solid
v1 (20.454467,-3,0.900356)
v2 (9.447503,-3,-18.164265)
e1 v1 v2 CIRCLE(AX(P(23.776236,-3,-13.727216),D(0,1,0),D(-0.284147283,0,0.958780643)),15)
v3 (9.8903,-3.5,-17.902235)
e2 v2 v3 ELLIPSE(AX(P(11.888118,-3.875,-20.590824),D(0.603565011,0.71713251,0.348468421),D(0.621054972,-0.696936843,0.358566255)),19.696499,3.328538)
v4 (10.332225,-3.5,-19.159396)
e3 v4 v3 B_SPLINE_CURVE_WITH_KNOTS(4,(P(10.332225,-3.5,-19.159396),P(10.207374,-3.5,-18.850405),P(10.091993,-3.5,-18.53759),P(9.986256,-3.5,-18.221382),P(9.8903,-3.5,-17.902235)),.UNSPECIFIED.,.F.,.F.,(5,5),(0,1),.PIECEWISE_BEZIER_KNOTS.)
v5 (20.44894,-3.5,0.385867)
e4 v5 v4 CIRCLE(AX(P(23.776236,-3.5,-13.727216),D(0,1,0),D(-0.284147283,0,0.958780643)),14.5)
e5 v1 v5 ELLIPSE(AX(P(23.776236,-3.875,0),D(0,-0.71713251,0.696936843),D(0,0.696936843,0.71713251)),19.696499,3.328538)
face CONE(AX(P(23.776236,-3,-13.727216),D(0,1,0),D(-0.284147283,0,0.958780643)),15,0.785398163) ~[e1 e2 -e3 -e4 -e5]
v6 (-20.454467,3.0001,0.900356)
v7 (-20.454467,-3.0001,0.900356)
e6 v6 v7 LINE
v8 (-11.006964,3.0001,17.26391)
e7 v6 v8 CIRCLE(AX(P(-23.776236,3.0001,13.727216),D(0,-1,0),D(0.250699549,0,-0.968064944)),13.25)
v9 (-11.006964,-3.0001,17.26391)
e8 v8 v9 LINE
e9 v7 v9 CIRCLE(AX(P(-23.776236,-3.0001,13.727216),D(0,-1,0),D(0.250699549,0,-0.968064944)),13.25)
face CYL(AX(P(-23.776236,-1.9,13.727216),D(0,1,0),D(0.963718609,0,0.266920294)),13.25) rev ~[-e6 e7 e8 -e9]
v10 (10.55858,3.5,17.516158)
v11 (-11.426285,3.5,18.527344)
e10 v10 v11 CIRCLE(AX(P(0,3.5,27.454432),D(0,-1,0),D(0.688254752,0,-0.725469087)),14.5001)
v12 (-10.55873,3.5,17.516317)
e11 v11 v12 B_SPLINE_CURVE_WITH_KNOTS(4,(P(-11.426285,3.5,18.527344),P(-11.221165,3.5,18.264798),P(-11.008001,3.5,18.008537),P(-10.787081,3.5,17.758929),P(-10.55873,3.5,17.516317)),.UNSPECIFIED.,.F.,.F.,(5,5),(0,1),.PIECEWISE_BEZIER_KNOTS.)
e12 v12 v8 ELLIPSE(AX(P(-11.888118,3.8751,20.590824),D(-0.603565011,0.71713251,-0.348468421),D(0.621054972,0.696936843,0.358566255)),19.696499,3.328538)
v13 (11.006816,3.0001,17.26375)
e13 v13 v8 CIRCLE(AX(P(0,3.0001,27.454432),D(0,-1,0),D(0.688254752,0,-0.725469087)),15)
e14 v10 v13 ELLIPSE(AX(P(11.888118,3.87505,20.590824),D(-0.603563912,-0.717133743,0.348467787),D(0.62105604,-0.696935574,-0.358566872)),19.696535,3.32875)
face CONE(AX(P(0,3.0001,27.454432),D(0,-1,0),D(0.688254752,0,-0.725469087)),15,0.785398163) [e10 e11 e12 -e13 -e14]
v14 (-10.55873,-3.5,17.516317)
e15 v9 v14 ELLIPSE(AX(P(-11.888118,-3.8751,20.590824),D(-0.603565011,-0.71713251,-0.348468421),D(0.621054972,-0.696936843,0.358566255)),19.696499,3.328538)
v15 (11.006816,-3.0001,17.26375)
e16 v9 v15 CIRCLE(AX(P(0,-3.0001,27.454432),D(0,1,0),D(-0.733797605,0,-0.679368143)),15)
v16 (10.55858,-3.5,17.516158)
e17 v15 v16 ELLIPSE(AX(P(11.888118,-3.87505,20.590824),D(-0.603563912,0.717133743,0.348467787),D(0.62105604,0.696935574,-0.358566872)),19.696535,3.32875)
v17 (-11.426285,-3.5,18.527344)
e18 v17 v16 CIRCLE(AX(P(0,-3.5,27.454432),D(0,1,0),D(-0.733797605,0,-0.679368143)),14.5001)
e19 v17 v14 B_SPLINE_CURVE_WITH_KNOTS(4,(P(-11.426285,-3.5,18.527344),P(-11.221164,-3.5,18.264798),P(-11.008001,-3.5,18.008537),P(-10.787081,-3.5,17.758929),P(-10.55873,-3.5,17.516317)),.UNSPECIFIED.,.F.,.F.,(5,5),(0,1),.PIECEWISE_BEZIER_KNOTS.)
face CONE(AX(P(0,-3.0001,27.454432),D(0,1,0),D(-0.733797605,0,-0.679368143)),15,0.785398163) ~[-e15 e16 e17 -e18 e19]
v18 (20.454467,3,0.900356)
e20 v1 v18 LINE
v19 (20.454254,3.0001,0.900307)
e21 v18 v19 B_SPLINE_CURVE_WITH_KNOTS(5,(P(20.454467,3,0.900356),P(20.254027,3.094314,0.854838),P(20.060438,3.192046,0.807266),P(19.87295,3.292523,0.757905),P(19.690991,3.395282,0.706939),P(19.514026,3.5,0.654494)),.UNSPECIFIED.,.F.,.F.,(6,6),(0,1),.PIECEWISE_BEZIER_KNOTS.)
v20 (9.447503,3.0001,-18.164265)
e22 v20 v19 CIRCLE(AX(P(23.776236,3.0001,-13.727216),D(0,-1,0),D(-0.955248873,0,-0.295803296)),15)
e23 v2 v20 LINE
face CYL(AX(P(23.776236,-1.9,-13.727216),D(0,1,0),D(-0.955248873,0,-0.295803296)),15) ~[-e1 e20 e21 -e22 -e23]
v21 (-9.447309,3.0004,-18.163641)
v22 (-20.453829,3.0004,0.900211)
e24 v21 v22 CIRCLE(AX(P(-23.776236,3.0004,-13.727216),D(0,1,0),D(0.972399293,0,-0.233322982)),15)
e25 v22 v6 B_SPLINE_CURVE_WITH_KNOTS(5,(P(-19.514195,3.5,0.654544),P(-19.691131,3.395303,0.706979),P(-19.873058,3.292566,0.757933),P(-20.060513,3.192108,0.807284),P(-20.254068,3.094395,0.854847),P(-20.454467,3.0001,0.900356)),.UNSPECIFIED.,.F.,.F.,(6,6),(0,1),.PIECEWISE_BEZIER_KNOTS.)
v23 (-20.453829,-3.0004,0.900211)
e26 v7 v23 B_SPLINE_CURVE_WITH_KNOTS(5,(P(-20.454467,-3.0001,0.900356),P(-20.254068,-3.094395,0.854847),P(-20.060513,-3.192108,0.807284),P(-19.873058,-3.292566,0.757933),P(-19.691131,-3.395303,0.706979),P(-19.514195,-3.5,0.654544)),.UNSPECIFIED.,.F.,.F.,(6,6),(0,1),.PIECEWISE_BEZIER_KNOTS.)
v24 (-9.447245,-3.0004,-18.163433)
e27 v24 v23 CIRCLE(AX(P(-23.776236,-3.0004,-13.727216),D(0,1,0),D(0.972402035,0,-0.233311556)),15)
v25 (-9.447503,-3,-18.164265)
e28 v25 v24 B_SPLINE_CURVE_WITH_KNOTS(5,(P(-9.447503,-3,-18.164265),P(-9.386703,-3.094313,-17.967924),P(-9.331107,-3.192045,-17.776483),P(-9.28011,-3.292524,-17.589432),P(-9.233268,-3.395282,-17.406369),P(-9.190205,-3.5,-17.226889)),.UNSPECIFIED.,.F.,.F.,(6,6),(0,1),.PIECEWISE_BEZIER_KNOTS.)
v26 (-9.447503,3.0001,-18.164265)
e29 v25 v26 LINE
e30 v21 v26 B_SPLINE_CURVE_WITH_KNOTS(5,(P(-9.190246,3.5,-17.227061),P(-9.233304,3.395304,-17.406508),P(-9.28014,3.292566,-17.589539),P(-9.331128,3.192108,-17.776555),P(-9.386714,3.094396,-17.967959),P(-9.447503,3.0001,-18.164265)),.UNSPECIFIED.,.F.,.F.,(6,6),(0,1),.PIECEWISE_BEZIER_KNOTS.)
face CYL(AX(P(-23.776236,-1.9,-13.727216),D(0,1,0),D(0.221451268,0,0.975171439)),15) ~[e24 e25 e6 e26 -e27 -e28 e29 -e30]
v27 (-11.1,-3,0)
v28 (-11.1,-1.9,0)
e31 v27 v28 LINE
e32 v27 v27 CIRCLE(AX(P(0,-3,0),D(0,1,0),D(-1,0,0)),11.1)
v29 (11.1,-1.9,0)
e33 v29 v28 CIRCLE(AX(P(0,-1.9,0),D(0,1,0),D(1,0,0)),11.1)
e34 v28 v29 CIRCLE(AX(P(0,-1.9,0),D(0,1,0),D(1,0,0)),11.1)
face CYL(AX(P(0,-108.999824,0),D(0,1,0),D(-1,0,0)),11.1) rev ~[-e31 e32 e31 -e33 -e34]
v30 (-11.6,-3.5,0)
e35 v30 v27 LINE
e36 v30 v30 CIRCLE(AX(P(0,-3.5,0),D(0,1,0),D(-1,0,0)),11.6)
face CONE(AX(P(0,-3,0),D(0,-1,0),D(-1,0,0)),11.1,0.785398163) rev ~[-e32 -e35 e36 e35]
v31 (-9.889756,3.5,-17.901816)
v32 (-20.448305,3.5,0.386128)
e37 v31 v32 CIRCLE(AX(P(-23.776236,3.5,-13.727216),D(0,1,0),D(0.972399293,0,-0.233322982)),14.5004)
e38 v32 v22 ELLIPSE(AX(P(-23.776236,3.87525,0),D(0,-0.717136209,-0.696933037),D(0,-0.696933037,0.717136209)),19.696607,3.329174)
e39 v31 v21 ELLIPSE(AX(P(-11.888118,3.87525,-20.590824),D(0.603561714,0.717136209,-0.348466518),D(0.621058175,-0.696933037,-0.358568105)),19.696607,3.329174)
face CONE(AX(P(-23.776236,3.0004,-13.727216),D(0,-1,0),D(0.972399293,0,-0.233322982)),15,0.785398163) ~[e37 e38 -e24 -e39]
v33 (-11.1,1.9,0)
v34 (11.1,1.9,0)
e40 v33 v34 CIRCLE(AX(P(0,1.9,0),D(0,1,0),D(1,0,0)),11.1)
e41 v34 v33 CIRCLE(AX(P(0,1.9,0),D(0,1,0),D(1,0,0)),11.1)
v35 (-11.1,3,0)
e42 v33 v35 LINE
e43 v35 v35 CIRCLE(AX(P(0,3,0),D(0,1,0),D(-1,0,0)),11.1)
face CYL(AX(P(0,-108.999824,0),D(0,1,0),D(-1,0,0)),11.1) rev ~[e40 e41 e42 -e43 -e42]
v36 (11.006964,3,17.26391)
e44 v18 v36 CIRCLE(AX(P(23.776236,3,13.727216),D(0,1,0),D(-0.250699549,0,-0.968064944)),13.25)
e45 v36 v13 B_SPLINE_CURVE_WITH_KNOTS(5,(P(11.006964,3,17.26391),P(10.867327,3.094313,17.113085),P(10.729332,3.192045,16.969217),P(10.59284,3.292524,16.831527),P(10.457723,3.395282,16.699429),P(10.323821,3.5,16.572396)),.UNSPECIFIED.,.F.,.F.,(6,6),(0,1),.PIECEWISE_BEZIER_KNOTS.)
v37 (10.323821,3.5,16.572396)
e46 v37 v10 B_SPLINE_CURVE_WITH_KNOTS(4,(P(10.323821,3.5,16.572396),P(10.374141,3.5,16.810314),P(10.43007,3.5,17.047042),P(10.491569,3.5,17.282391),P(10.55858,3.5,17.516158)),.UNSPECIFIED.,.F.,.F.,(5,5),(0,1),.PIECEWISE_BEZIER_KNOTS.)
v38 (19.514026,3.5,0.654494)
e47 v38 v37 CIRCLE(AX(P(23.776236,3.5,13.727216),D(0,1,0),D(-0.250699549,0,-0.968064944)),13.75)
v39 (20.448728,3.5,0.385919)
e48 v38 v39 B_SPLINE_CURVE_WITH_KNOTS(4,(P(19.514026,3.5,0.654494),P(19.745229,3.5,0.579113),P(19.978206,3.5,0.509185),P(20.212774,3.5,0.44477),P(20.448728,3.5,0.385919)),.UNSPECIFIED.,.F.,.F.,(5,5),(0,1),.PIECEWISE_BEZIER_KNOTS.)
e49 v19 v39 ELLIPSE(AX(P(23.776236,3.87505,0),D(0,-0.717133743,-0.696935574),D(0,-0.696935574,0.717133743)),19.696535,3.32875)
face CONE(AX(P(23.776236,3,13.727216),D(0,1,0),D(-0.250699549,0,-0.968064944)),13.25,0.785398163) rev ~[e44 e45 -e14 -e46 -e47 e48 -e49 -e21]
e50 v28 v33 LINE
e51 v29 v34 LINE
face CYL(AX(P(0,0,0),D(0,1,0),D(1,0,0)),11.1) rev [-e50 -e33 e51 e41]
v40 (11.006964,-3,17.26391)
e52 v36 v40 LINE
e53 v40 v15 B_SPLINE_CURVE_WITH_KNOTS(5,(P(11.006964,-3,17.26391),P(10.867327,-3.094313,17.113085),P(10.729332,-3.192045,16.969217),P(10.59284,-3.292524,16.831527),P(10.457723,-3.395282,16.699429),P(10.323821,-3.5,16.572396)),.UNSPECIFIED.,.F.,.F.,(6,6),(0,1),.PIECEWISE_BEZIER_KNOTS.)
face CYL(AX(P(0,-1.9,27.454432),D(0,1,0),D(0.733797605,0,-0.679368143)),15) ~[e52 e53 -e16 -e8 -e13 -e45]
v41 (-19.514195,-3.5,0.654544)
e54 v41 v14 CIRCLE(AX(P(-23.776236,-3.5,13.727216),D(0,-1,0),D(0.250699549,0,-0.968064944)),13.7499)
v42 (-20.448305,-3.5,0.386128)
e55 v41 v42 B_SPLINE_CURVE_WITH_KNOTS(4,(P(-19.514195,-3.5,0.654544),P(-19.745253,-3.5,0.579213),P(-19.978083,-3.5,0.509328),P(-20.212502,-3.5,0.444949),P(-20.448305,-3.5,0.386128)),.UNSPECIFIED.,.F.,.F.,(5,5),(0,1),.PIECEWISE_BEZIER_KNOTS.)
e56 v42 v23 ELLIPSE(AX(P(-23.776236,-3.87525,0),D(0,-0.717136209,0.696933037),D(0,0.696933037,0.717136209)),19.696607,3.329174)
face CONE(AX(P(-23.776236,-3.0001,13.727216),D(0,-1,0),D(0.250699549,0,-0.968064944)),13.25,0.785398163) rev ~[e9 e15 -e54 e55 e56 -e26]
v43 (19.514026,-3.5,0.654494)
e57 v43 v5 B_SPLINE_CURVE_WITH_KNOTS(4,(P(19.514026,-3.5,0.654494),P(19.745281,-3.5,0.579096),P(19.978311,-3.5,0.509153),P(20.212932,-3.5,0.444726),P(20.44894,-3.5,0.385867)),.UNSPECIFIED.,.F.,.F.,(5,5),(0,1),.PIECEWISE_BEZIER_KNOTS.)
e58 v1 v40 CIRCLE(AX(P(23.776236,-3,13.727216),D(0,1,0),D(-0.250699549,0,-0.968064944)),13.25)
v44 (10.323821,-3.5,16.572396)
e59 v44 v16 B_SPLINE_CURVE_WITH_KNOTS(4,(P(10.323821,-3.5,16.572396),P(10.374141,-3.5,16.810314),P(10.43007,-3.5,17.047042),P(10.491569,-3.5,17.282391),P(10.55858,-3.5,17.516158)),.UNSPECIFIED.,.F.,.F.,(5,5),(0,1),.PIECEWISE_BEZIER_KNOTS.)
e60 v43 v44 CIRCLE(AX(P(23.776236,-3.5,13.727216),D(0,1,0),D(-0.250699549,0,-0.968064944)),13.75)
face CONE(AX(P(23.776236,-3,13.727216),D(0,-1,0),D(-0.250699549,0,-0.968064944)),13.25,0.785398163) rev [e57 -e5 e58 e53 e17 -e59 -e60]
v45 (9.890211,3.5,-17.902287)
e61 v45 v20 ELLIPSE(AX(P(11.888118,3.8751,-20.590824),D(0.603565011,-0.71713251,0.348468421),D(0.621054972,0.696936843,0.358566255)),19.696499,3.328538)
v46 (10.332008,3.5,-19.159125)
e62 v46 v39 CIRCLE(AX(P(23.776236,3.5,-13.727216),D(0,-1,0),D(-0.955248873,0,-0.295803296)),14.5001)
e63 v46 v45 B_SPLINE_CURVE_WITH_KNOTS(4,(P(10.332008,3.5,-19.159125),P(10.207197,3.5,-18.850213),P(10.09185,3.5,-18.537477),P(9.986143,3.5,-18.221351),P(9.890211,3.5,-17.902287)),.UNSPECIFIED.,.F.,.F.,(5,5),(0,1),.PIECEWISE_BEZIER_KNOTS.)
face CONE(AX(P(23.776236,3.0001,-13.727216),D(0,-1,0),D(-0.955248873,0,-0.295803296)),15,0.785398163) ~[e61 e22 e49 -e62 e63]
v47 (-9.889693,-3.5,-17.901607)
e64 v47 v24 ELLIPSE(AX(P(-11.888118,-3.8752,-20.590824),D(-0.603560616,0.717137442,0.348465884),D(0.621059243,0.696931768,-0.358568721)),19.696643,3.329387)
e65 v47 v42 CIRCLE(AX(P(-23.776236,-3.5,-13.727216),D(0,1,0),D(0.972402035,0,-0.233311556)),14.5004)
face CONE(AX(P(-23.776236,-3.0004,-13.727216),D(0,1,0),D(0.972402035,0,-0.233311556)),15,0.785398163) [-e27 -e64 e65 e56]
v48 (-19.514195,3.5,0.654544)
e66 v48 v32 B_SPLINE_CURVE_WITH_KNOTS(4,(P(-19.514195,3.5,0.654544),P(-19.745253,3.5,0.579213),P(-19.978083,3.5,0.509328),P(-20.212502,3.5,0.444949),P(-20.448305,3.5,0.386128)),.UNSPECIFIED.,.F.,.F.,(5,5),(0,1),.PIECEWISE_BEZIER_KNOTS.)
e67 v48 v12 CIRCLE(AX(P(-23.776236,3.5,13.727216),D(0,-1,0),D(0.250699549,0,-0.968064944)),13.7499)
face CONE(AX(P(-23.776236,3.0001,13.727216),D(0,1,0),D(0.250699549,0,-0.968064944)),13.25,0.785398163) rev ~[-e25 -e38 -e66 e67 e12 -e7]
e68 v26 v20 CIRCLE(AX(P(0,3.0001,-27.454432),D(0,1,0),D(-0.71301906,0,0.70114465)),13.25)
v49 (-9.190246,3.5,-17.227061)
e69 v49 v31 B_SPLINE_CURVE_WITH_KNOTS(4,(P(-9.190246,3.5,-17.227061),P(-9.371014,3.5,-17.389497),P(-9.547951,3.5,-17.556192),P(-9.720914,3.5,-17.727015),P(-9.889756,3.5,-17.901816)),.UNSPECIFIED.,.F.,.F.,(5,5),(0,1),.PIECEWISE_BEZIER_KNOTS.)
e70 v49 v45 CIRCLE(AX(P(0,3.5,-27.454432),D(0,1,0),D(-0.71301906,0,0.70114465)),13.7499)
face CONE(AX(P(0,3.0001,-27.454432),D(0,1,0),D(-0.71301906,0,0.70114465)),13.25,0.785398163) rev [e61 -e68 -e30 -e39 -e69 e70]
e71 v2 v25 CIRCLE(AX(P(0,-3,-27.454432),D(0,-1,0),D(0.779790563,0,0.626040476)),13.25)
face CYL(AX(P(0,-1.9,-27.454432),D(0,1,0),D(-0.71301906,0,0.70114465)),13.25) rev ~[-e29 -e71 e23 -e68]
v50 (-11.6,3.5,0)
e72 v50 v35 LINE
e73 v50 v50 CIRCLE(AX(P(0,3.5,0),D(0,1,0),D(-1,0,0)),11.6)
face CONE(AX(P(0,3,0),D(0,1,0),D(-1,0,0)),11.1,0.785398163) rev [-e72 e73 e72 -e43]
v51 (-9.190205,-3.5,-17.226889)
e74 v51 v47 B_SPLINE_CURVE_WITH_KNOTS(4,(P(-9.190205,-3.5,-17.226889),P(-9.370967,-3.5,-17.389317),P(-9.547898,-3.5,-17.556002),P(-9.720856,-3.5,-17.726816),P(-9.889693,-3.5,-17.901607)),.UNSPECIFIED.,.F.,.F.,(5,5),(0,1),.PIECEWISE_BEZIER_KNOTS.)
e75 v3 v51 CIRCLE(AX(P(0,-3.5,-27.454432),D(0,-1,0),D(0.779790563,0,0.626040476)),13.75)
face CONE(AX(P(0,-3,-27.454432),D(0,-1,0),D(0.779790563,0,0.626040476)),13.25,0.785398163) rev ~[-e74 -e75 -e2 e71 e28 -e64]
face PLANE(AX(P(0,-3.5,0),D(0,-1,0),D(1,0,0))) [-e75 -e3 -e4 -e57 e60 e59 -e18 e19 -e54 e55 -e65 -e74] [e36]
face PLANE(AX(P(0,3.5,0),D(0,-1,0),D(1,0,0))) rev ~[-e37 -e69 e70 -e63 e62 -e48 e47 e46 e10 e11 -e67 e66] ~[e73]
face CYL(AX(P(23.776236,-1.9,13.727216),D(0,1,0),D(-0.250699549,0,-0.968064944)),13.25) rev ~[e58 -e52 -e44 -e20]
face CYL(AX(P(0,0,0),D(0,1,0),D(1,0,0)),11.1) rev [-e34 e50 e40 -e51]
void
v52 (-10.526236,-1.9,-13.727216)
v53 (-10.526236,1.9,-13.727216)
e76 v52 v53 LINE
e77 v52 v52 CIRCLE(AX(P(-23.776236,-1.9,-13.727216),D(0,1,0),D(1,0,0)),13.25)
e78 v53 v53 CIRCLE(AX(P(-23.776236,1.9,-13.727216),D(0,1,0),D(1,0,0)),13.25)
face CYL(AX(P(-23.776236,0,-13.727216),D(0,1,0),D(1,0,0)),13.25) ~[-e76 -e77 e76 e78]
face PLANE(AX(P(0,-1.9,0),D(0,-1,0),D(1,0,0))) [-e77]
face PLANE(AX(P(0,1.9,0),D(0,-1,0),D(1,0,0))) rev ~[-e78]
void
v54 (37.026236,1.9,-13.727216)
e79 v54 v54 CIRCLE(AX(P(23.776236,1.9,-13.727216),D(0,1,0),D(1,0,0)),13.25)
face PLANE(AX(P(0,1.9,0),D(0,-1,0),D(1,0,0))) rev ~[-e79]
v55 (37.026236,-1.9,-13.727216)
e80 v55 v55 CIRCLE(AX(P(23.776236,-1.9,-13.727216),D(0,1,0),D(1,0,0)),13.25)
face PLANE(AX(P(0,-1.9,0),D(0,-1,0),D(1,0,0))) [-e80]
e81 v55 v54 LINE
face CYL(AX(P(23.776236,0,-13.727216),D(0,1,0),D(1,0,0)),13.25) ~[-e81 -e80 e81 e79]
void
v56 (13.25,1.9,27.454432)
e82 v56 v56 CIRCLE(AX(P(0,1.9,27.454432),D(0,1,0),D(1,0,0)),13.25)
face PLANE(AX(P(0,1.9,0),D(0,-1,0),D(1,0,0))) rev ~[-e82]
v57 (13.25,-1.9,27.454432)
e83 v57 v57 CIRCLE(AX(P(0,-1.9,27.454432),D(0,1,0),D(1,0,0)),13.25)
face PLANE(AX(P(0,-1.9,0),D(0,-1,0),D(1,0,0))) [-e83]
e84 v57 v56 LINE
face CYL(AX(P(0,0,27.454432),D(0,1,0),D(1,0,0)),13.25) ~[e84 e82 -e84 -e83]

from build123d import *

# Parameters (mm, degrees)
F0_R        = 13.25
F0_R_2      = 11.1
F1_DEPTH    = 3
F2_START    = 1.9
F2_DEPTH    = 1.6
F3_START    = -1.9
F3_DEPTH    = 1.6
F5_D        = 22.2
F6_C1_SIZE  = 0.5
F6_C2_SIZE  = 0.5
F6_C3_SIZE  = 0.4999
F6_C4_SIZE  = 0.4999
F6_C5_SIZE  = 0.4999
F6_C6_SIZE  = 0.4999
F6_C7_SIZE  = 0.4996
F6_C8_SIZE  = 0.5
F6_C9_SIZE  = 0.4999
F6_C10_SIZE = 0.5
F6_C11_SIZE = 0.5
F6_C12_SIZE = 0.4999
F6_C13_SIZE = 0.4996
F6_C14_SIZE = 0.5


# Not quite as in the source:
# - a fillet or chamfer is up to 0.001 mm smaller than in the source, because OpenCascade refuses the exact size


with BuildPart() as f1:
    # F0 (on Front) → F1 (new body, symmetric)
    with BuildSketch(Plane.XZ):
        with BuildLine():
            ThreePointArc((20.4544666255, 0.9003555386), (12.301399045, 7.10221605), (11.0069640816, 17.2639099492))
            ThreePointArc((11.0069640816, 17.2639099492), (0, 42.4544321001), (-11.0069640816, 17.2639099492))
            ThreePointArc((-11.0069640816, 17.2639099492), (-12.301399045, 7.10221605), (-20.4544666255, 0.9003555386))
            ThreePointArc((-20.4544666255, 0.9003555386), (-36.7666167019, -21.22721605), (-9.4475025439, -18.1642654878))
            ThreePointArc((-9.4475025439, -18.1642654878), (0, -14.2044321001), (9.4475025439, -18.1642654878))
            ThreePointArc((9.4475025439, -18.1642654878), (36.7666167019, -21.22721605), (20.4544666255, 0.9003555386))
        make_face()
        with Locations((-23.7762356451, -13.72721605)):
            Circle(F0_R, mode=Mode.SUBTRACT)
        with Locations((23.7762356451, -13.72721605)):
            Circle(F0_R, mode=Mode.SUBTRACT)
        Circle(F0_R_2, mode=Mode.SUBTRACT)
        with Locations((0, 27.4544321001)):
            Circle(F0_R, mode=Mode.SUBTRACT)
    extrude(amount=F1_DEPTH, both=True)

    # F0 (on Front) → F2 (join)
    with BuildSketch(Plane.XZ.offset(F2_START)):
        with BuildLine():
            ThreePointArc((20.4544666255, 0.9003555386), (12.301399045, 7.10221605), (11.0069640816, 17.2639099492))
            ThreePointArc((11.0069640816, 17.2639099492), (0, 42.4544321001), (-11.0069640816, 17.2639099492))
            ThreePointArc((-11.0069640816, 17.2639099492), (-12.301399045, 7.10221605), (-20.4544666255, 0.9003555386))
            ThreePointArc((-20.4544666255, 0.9003555386), (-36.7666167019, -21.22721605), (-9.4475025439, -18.1642654878))
            ThreePointArc((-9.4475025439, -18.1642654878), (0, -14.2044321001), (9.4475025439, -18.1642654878))
            ThreePointArc((9.4475025439, -18.1642654878), (36.7666167019, -21.22721605), (20.4544666255, 0.9003555386))
        make_face()
        with Locations((-23.7762356451, -13.72721605)):
            Circle(F0_R, mode=Mode.SUBTRACT)
        with Locations((23.7762356451, -13.72721605)):
            Circle(F0_R, mode=Mode.SUBTRACT)
        Circle(F0_R_2, mode=Mode.SUBTRACT)
        with Locations((0, 27.4544321001)):
            Circle(F0_R, mode=Mode.SUBTRACT)
        with Locations((-23.7762356451, -13.72721605)):
            Circle(F0_R)
        with Locations((0, 27.4544321001)):
            Circle(F0_R)
        with Locations((23.7762356451, -13.72721605)):
            Circle(F0_R)
        Circle(F0_R_2)
    extrude(amount=F2_DEPTH)

    # F0 (on Front) → F3 (join)
    with BuildSketch(Plane.XZ.offset(F3_START)):
        with BuildLine():
            ThreePointArc((20.4544666255, 0.9003555386), (12.301399045, 7.10221605), (11.0069640816, 17.2639099492))
            ThreePointArc((11.0069640816, 17.2639099492), (0, 42.4544321001), (-11.0069640816, 17.2639099492))
            ThreePointArc((-11.0069640816, 17.2639099492), (-12.301399045, 7.10221605), (-20.4544666255, 0.9003555386))
            ThreePointArc((-20.4544666255, 0.9003555386), (-36.7666167019, -21.22721605), (-9.4475025439, -18.1642654878))
            ThreePointArc((-9.4475025439, -18.1642654878), (0, -14.2044321001), (9.4475025439, -18.1642654878))
            ThreePointArc((9.4475025439, -18.1642654878), (36.7666167019, -21.22721605), (20.4544666255, 0.9003555386))
        make_face()
        with Locations((-23.7762356451, -13.72721605)):
            Circle(F0_R, mode=Mode.SUBTRACT)
        with Locations((23.7762356451, -13.72721605)):
            Circle(F0_R, mode=Mode.SUBTRACT)
        Circle(F0_R_2, mode=Mode.SUBTRACT)
        with Locations((0, 27.4544321001)):
            Circle(F0_R, mode=Mode.SUBTRACT)
        with Locations((0, 27.4544321001)):
            Circle(F0_R)
        with Locations((-23.7762356451, -13.72721605)):
            Circle(F0_R)
        with Locations((23.7762356451, -13.72721605)):
            Circle(F0_R)
        Circle(F0_R_2)
    extrude(amount=-F3_DEPTH)

    # F5 (through all)
    with Locations(Plane.XZ.offset(3.5)):
        with Locations((0, 0)):
            Hole(F5_D / 2)

    # F6: chamfer of 0.5 on 14 edges, made by hand

    # F6_c1
    f6_c1_edges = [f1.edges().sort_by_distance(p)[0] for p in [
        (12.301399045, 3.5, 7.10221605),
    ]]
    chamfer(f6_c1_edges, length=F6_C1_SIZE)

    # F6_c2
    f6_c2_edges = [f1.edges().sort_by_distance(p)[0] for p in [
        (12.301399045, -3.5, 7.10221605),
    ]]
    chamfer(f6_c2_edges, length=F6_C2_SIZE)

    # F6_c3 (size 0.5 in the source; OpenCascade refuses exactly that, so slightly less here)
    f6_c3_edges = [f1.edges().sort_by_distance(p)[0] for p in [
        (36.7666167019, 3.5, -21.22721605),
    ]]
    chamfer(f6_c3_edges, length=F6_C3_SIZE)

    # F6_c4 (size 0.5 in the source; OpenCascade refuses exactly that, so slightly less here)
    f6_c4_edges = [f1.edges().sort_by_distance(p)[0] for p in [
        (0, 3.5, 42.4544321001),
    ]]
    chamfer(f6_c4_edges, length=F6_C4_SIZE)

    # F6_c5 (size 0.5 in the source; OpenCascade refuses exactly that, so slightly less here)
    f6_c5_edges = [f1.edges().sort_by_distance(p)[0] for p in [
        (0, 3.5, -14.2044321001),
    ]]
    chamfer(f6_c5_edges, length=F6_C5_SIZE)

    # F6_c6 (size 0.5 in the source; OpenCascade refuses exactly that, so slightly less here)
    f6_c6_edges = [f1.edges().sort_by_distance(p)[0] for p in [
        (-12.301399045, 3.5, 7.10221605),
    ]]
    chamfer(f6_c6_edges, length=F6_C6_SIZE)

    # F6_c7 (size 0.5 in the source; OpenCascade refuses exactly that, so slightly less here)
    f6_c7_edges = [f1.edges().sort_by_distance(p)[0] for p in [
        (-36.7666167019, 3.5, -21.22721605),
    ]]
    chamfer(f6_c7_edges, length=F6_C7_SIZE)

    # F6_c8
    f6_c8_edges = [f1.edges().sort_by_distance(p)[0] for p in [
        (-11.1, 3.5, 0),
    ]]
    chamfer(f6_c8_edges, length=F6_C8_SIZE)

    # F6_c9 (size 0.5 in the source; OpenCascade refuses exactly that, so slightly less here)
    f6_c9_edges = [f1.edges().sort_by_distance(p)[0] for p in [
        (0, -3.5, 42.4544321001),
    ]]
    chamfer(f6_c9_edges, length=F6_C9_SIZE)

    # F6_c10
    f6_c10_edges = [f1.edges().sort_by_distance(p)[0] for p in [
        (36.7666167019, -3.5, -21.22721605),
    ]]
    chamfer(f6_c10_edges, length=F6_C10_SIZE)

    # F6_c11
    f6_c11_edges = [f1.edges().sort_by_distance(p)[0] for p in [
        (0, -3.5, -14.2044321001),
    ]]
    chamfer(f6_c11_edges, length=F6_C11_SIZE)

    # F6_c12 (size 0.5 in the source; OpenCascade refuses exactly that, so slightly less here)
    f6_c12_edges = [f1.edges().sort_by_distance(p)[0] for p in [
        (-12.301399045, -3.5, 7.10221605),
    ]]
    chamfer(f6_c12_edges, length=F6_C12_SIZE)

    # F6_c13 (size 0.5 in the source; OpenCascade refuses exactly that, so slightly less here)
    f6_c13_edges = [f1.edges().sort_by_distance(p)[0] for p in [
        (-36.7666167019, -3.5, -21.22721605),
    ]]
    chamfer(f6_c13_edges, length=F6_C13_SIZE)

    # F6_c14
    f6_c14_edges = [f1.edges().sort_by_distance(p)[0] for p in [
        (-11.1, -3.5, 0),
    ]]
    chamfer(f6_c14_edges, length=F6_C14_SIZE)


solid = f1.part
